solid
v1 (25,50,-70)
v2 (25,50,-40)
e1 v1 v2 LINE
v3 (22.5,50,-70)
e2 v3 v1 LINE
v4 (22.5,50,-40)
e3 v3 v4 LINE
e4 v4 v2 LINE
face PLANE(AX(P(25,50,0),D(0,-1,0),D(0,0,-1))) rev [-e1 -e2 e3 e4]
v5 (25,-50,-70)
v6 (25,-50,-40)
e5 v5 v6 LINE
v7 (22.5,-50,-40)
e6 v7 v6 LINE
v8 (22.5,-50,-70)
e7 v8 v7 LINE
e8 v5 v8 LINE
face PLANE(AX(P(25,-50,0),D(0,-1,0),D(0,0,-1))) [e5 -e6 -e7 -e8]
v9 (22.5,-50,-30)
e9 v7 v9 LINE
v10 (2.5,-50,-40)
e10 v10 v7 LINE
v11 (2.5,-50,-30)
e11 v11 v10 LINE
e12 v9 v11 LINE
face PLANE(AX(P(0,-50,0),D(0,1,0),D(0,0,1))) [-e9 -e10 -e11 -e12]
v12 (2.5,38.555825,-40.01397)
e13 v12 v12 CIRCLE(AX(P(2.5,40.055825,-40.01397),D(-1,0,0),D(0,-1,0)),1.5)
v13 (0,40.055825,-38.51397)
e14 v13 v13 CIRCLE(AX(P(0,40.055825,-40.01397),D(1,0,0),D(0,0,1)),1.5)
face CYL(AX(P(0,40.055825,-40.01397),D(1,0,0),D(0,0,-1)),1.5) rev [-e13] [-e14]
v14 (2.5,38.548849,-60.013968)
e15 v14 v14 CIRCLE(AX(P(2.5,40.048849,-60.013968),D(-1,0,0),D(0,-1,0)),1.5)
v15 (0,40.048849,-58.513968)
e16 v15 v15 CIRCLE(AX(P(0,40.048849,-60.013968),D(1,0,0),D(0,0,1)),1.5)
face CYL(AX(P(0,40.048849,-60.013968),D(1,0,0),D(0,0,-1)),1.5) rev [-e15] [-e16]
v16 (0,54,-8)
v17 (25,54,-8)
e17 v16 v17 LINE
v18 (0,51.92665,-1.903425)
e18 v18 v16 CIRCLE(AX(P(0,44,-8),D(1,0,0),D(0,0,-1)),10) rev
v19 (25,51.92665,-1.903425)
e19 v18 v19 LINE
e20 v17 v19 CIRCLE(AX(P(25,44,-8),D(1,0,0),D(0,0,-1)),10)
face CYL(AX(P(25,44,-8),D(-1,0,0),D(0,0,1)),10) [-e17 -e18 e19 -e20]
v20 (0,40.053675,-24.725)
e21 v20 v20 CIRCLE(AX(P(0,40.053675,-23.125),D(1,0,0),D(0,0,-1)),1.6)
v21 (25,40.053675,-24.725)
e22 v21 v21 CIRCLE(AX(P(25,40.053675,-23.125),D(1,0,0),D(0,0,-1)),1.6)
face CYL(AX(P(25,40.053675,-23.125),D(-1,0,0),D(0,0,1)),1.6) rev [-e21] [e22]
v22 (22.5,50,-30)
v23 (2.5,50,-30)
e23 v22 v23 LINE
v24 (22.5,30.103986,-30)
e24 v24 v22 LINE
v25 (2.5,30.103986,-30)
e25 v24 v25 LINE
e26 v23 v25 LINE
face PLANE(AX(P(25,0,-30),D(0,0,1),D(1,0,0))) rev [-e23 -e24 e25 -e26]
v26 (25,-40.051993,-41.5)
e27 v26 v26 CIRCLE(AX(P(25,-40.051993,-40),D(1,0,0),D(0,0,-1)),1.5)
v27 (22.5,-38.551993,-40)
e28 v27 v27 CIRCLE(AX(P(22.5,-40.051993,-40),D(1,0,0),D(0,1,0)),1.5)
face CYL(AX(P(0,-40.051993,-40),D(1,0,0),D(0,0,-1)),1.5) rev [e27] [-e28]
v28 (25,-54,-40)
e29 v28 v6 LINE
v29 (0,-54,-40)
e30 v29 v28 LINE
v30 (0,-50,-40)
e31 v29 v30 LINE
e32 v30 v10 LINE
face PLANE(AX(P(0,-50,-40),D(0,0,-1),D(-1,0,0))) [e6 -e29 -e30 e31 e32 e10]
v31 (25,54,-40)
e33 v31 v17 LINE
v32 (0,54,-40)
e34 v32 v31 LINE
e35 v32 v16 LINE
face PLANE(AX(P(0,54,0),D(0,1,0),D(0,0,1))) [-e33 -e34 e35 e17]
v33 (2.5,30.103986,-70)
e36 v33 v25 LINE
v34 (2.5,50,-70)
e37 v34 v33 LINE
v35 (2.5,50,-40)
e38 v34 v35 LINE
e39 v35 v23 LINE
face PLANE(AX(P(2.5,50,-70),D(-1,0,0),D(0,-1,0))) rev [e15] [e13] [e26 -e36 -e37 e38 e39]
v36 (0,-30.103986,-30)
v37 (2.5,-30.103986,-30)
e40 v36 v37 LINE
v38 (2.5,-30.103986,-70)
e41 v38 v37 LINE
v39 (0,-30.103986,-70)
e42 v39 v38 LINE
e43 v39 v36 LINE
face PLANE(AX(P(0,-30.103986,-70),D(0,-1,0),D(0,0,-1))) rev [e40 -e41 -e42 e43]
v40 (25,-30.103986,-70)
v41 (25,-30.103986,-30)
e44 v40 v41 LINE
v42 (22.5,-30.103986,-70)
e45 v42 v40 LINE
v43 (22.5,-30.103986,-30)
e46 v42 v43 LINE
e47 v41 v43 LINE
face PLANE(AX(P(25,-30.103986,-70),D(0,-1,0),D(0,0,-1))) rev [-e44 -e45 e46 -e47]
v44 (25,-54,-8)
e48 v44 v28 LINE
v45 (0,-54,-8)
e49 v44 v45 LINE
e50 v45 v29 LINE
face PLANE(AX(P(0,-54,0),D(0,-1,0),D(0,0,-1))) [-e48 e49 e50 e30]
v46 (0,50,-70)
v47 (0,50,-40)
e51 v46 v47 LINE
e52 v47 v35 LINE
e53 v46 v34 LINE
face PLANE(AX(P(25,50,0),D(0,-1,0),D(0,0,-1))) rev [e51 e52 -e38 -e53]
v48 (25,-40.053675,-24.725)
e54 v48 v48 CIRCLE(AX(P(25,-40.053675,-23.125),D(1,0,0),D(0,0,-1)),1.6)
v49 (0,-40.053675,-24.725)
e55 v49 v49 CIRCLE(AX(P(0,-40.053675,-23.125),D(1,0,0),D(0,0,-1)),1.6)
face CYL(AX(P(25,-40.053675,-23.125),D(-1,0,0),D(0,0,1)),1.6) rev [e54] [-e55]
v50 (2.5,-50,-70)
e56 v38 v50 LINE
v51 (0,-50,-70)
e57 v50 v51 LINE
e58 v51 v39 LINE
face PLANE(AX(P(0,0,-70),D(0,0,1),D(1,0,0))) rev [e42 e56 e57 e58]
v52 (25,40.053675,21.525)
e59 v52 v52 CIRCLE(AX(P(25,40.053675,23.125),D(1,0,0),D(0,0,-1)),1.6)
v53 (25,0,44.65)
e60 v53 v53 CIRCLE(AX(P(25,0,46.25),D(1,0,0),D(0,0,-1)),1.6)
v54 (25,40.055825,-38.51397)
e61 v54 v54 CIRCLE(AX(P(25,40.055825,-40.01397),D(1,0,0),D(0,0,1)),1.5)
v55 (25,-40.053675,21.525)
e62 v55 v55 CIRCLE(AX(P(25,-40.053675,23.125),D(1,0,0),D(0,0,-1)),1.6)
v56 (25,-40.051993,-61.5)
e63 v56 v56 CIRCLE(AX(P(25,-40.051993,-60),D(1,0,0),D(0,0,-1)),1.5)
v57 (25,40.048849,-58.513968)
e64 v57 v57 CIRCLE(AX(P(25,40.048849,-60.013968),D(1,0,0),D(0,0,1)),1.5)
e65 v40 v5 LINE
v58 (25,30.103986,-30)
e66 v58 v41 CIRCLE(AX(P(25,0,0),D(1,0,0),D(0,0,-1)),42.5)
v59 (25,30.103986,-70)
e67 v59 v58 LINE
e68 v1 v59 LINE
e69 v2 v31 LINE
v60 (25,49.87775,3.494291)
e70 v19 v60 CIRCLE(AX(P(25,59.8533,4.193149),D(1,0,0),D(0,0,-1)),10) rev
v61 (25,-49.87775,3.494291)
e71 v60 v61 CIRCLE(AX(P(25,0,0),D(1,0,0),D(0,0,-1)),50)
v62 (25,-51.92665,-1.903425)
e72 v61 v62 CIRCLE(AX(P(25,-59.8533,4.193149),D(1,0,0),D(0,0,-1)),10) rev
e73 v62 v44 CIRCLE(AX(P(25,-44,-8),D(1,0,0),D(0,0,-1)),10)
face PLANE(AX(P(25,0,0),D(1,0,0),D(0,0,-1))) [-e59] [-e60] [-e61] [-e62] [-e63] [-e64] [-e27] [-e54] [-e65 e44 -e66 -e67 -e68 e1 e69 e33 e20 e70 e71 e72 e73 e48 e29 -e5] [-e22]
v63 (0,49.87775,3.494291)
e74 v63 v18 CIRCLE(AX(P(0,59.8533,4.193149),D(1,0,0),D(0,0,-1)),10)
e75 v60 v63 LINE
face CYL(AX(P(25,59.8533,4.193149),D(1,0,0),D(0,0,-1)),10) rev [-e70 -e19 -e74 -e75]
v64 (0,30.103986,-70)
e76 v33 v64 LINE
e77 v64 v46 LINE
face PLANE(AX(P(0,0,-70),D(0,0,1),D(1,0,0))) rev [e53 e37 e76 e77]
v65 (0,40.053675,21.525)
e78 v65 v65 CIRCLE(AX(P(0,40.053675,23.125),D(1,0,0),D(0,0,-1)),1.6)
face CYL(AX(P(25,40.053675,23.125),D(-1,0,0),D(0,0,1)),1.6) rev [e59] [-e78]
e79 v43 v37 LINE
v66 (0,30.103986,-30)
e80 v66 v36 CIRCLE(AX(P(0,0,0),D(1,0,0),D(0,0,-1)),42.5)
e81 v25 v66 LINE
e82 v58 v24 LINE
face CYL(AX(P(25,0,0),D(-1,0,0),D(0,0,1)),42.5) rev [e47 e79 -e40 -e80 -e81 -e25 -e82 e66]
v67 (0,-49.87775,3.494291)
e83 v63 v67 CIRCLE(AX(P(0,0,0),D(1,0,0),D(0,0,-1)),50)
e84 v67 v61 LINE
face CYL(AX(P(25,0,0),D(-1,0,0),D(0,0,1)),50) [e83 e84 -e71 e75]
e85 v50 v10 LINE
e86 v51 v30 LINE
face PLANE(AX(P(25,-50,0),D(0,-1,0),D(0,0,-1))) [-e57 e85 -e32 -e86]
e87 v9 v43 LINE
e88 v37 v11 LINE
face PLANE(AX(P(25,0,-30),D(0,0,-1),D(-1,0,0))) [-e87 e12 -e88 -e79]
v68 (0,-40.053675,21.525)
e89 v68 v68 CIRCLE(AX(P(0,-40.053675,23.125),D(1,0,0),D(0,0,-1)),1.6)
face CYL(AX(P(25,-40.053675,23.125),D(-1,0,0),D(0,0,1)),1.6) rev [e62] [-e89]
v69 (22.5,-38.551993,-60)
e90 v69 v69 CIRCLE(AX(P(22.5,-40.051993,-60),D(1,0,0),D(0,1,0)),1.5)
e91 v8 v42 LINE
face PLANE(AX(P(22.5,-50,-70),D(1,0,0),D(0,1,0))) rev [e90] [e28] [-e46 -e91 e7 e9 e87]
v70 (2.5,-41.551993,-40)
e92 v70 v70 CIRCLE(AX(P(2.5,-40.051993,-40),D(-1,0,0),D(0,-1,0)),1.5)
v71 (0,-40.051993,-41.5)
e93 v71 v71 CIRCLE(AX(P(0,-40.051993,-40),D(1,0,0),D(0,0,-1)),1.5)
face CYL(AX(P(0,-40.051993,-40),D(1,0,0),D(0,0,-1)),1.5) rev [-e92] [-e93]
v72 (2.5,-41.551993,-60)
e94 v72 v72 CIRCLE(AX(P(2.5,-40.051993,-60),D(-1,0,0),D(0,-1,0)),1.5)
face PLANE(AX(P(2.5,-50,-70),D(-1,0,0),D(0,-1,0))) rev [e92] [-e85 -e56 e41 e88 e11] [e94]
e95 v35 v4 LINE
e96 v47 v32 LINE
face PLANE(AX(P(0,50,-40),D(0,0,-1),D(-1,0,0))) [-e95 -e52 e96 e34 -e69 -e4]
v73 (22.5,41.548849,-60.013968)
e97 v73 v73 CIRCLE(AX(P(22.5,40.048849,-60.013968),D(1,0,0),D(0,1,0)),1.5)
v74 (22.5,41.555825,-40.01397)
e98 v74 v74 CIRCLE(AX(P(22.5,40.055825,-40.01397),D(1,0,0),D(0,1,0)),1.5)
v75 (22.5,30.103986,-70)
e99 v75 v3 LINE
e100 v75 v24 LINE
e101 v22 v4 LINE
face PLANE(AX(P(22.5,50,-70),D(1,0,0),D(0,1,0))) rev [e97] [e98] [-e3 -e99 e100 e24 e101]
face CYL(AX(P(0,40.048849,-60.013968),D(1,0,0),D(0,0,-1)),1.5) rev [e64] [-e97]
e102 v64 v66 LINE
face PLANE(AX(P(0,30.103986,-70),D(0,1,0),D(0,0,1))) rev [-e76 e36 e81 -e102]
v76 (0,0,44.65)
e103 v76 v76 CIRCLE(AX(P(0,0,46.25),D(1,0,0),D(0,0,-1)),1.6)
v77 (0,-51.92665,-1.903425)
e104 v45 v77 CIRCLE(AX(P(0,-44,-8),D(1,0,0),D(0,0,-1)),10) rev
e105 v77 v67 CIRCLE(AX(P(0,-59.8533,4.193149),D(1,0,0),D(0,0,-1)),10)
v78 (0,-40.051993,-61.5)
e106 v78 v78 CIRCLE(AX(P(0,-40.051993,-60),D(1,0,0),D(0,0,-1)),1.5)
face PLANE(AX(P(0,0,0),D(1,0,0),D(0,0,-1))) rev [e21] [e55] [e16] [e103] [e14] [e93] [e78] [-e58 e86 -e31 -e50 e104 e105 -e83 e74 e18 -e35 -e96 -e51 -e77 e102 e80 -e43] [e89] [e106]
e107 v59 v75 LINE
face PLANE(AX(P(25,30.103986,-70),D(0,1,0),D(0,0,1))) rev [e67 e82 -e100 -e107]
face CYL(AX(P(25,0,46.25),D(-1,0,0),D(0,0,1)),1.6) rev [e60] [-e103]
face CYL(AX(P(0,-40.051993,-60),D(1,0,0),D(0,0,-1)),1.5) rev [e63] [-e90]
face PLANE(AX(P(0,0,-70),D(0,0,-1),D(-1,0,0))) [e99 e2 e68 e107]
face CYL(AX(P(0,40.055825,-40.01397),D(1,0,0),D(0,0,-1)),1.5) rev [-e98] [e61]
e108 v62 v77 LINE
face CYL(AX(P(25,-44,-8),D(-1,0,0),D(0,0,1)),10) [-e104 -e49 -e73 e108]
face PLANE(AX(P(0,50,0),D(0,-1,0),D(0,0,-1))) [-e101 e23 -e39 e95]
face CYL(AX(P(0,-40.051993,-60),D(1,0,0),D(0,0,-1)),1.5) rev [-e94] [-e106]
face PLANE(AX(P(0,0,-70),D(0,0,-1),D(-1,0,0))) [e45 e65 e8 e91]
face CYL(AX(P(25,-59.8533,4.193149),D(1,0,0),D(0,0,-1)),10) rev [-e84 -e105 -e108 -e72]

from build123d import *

# Parameters (mm, degrees)
SKETCH_1_R          = 1.6
EXTRUDE_1_DEPTH     = 25
SKETCH_2_W          = 2.5
SKETCH_2_H          = 19.896013553
EXTRUDE_2_DEPTH     = 40
SKETCH_3_R          = 1.5
CUT_EXTRUDE_1_DEPTH = 90.582364336
SKETCH_4_W          = 40
SKETCH_4_H          = 4
EXTRUDE_3_DEPTH     = 25
FILLET_4_R          = 10
FILLET_5_R          = 10


with BuildPart() as part:
    # 草图1 → 凸台-拉伸1 (new body)
    # profile 1 of 2: a face of its own
    with BuildSketch(Plane(origin=(0, 0, 0), x_dir=(0, 0, -1), z_dir=(1, 0, 0))):
        with BuildLine():
            ThreePointArc((-47.85, 0), (-46.25, 1.6), (-44.65, 0))
            Line((-44.65, 0), (-42.5, 0))
            ThreePointArc((-42.5, 0), (-16.298006013, 39.25079617), (30, 30.103986447))
            Line((30, 30.103986447), (30, 50))
            Line((30, 50), (0, 50))
            ThreePointArc((0, 50), (-35.355339059, 35.355339059), (-50, 0))
            Line((-50, 0), (-47.85, 0))
        make_face()
        with Locations((-23.125, 40.053674925)):
            Circle(SKETCH_1_R, mode=Mode.SUBTRACT)
        with Locations((23.125, 40.053674925)):
            Circle(SKETCH_1_R, mode=Mode.SUBTRACT)
    # profile 2 of 2: a face of its own
    with BuildSketch(Plane(origin=(0, 0, 0), x_dir=(0, 0, -1), z_dir=(1, 0, 0))):
        with BuildLine():
            Line((-42.5, 0), (-44.65, 0))
            ThreePointArc((-44.65, 0), (-46.25, -1.6), (-47.85, 0))
            Line((-47.85, 0), (-50, 0))
            ThreePointArc((-50, 0), (-35.355339059, -35.355339059), (0, -50))
            Line((0, -50), (30, -50))
            Line((30, -50), (30, -30.103986447))
            ThreePointArc((30, -30.103986447), (-16.298006013, -39.25079617), (-42.5, 0))
        make_face()
        with Locations((-23.125, -40.053674925)):
            Circle(SKETCH_1_R, mode=Mode.SUBTRACT)
        with Locations((23.125, -40.053674925)):
            Circle(SKETCH_1_R, mode=Mode.SUBTRACT)
    extrude(amount=EXTRUDE_1_DEPTH)

    # 草图2 → 凸台-拉伸2 (add)
    with BuildSketch(Plane(origin=(0, 0, -30), x_dir=(-1, 0, 0), z_dir=(0, 0, -1))):
        with Locations((-23.75, 40.051993223)):
            Rectangle(SKETCH_2_W, SKETCH_2_H)
        with Locations((-1.25, 40.051993223)):
            Rectangle(SKETCH_2_W, SKETCH_2_H)
        with Locations((-1.25, -40.051993223)):
            Rectangle(SKETCH_2_W, SKETCH_2_H)
        with Locations((-23.75, -40.051993223)):
            Rectangle(SKETCH_2_W, SKETCH_2_H)
    extrude(amount=EXTRUDE_2_DEPTH)

    # 草图3 → 切除-拉伸1 (cut, through all)
    with BuildSketch(Plane(origin=(25, 0, 0), x_dir=(0, 0, -1), z_dir=(1, 0, 0))):
        with Locations((60, -40.051993223)):
            Circle(SKETCH_3_R)
        with Locations((40, -40.051993223)):
            Circle(SKETCH_3_R)
        with Locations(Location((40.013969678, 40.055824633, 0), (0, 0, 270))):
            Circle(SKETCH_3_R)
        with Locations(Location((60.013968461, 40.048849195, 0), (0, 0, 270))):
            Circle(SKETCH_3_R)
    extrude(amount=-CUT_EXTRUDE_1_DEPTH, mode=Mode.SUBTRACT)

    # 草图4 → 凸台-拉伸3 (add)
    with BuildSketch(Plane(origin=(25, 0, 0), x_dir=(0, 0, -1), z_dir=(1, 0, 0))):
        with Locations((20, 52)):
            Rectangle(SKETCH_4_W, SKETCH_4_H)
        with Locations((20, -52)):
            Rectangle(SKETCH_4_W, SKETCH_4_H)
    extrude(amount=-EXTRUDE_3_DEPTH)

    # 圆角4
    # the kernel refuses this fillet: 10 mm, written as the material it takes off along each edge
    with BuildSketch(Plane(origin=(45, -54, 0), x_dir=(0, 0, -1), z_dir=(-1, 0, 0))) as fillet_4_piece_1:
        with BuildLine():
            CenterArc((8, -10), FILLET_4_R, 90, 53.130102354)
            Line((0, -4), (-0.16, -3.88))
            ThreePointArc((-0.16, -3.88), (-0.2, -2), (-0.2, 0))
            Line((-0.2, 0), (0, 0.2))
            Line((0, 0.2), (8, 0.2))
            Line((8, 0.2), (8, 0))
        make_face()
    extrude(amount=65, mode=Mode.SUBTRACT)
    with BuildSketch(Plane(origin=(45, 54, 0), x_dir=(0, 0, -1), z_dir=(-1, 0, 0))) as fillet_4_piece_2:
        with BuildLine():
            CenterArc((8, 10), FILLET_4_R, 216.869897646, 53.130102354)
            Line((0, 4), (-0.16, 3.88))
            ThreePointArc((-0.16, 3.88), (-0.2, 2), (-0.2, 0))
            Line((-0.2, 0), (0, -0.2))
            Line((0, -0.2), (8, -0.2))
            Line((8, -0.2), (8, 0))
        make_face()
    extrude(amount=65, mode=Mode.SUBTRACT)

    # 圆角5
    fillet_5_edges = [part.edges().sort_by_distance(p)[0] for p in [
        (12.5, -50, 0),
        (12.5, 50, 0),
    ]]
    fillet(fillet_5_edges, radius=FILLET_5_R)


solid = part.part
